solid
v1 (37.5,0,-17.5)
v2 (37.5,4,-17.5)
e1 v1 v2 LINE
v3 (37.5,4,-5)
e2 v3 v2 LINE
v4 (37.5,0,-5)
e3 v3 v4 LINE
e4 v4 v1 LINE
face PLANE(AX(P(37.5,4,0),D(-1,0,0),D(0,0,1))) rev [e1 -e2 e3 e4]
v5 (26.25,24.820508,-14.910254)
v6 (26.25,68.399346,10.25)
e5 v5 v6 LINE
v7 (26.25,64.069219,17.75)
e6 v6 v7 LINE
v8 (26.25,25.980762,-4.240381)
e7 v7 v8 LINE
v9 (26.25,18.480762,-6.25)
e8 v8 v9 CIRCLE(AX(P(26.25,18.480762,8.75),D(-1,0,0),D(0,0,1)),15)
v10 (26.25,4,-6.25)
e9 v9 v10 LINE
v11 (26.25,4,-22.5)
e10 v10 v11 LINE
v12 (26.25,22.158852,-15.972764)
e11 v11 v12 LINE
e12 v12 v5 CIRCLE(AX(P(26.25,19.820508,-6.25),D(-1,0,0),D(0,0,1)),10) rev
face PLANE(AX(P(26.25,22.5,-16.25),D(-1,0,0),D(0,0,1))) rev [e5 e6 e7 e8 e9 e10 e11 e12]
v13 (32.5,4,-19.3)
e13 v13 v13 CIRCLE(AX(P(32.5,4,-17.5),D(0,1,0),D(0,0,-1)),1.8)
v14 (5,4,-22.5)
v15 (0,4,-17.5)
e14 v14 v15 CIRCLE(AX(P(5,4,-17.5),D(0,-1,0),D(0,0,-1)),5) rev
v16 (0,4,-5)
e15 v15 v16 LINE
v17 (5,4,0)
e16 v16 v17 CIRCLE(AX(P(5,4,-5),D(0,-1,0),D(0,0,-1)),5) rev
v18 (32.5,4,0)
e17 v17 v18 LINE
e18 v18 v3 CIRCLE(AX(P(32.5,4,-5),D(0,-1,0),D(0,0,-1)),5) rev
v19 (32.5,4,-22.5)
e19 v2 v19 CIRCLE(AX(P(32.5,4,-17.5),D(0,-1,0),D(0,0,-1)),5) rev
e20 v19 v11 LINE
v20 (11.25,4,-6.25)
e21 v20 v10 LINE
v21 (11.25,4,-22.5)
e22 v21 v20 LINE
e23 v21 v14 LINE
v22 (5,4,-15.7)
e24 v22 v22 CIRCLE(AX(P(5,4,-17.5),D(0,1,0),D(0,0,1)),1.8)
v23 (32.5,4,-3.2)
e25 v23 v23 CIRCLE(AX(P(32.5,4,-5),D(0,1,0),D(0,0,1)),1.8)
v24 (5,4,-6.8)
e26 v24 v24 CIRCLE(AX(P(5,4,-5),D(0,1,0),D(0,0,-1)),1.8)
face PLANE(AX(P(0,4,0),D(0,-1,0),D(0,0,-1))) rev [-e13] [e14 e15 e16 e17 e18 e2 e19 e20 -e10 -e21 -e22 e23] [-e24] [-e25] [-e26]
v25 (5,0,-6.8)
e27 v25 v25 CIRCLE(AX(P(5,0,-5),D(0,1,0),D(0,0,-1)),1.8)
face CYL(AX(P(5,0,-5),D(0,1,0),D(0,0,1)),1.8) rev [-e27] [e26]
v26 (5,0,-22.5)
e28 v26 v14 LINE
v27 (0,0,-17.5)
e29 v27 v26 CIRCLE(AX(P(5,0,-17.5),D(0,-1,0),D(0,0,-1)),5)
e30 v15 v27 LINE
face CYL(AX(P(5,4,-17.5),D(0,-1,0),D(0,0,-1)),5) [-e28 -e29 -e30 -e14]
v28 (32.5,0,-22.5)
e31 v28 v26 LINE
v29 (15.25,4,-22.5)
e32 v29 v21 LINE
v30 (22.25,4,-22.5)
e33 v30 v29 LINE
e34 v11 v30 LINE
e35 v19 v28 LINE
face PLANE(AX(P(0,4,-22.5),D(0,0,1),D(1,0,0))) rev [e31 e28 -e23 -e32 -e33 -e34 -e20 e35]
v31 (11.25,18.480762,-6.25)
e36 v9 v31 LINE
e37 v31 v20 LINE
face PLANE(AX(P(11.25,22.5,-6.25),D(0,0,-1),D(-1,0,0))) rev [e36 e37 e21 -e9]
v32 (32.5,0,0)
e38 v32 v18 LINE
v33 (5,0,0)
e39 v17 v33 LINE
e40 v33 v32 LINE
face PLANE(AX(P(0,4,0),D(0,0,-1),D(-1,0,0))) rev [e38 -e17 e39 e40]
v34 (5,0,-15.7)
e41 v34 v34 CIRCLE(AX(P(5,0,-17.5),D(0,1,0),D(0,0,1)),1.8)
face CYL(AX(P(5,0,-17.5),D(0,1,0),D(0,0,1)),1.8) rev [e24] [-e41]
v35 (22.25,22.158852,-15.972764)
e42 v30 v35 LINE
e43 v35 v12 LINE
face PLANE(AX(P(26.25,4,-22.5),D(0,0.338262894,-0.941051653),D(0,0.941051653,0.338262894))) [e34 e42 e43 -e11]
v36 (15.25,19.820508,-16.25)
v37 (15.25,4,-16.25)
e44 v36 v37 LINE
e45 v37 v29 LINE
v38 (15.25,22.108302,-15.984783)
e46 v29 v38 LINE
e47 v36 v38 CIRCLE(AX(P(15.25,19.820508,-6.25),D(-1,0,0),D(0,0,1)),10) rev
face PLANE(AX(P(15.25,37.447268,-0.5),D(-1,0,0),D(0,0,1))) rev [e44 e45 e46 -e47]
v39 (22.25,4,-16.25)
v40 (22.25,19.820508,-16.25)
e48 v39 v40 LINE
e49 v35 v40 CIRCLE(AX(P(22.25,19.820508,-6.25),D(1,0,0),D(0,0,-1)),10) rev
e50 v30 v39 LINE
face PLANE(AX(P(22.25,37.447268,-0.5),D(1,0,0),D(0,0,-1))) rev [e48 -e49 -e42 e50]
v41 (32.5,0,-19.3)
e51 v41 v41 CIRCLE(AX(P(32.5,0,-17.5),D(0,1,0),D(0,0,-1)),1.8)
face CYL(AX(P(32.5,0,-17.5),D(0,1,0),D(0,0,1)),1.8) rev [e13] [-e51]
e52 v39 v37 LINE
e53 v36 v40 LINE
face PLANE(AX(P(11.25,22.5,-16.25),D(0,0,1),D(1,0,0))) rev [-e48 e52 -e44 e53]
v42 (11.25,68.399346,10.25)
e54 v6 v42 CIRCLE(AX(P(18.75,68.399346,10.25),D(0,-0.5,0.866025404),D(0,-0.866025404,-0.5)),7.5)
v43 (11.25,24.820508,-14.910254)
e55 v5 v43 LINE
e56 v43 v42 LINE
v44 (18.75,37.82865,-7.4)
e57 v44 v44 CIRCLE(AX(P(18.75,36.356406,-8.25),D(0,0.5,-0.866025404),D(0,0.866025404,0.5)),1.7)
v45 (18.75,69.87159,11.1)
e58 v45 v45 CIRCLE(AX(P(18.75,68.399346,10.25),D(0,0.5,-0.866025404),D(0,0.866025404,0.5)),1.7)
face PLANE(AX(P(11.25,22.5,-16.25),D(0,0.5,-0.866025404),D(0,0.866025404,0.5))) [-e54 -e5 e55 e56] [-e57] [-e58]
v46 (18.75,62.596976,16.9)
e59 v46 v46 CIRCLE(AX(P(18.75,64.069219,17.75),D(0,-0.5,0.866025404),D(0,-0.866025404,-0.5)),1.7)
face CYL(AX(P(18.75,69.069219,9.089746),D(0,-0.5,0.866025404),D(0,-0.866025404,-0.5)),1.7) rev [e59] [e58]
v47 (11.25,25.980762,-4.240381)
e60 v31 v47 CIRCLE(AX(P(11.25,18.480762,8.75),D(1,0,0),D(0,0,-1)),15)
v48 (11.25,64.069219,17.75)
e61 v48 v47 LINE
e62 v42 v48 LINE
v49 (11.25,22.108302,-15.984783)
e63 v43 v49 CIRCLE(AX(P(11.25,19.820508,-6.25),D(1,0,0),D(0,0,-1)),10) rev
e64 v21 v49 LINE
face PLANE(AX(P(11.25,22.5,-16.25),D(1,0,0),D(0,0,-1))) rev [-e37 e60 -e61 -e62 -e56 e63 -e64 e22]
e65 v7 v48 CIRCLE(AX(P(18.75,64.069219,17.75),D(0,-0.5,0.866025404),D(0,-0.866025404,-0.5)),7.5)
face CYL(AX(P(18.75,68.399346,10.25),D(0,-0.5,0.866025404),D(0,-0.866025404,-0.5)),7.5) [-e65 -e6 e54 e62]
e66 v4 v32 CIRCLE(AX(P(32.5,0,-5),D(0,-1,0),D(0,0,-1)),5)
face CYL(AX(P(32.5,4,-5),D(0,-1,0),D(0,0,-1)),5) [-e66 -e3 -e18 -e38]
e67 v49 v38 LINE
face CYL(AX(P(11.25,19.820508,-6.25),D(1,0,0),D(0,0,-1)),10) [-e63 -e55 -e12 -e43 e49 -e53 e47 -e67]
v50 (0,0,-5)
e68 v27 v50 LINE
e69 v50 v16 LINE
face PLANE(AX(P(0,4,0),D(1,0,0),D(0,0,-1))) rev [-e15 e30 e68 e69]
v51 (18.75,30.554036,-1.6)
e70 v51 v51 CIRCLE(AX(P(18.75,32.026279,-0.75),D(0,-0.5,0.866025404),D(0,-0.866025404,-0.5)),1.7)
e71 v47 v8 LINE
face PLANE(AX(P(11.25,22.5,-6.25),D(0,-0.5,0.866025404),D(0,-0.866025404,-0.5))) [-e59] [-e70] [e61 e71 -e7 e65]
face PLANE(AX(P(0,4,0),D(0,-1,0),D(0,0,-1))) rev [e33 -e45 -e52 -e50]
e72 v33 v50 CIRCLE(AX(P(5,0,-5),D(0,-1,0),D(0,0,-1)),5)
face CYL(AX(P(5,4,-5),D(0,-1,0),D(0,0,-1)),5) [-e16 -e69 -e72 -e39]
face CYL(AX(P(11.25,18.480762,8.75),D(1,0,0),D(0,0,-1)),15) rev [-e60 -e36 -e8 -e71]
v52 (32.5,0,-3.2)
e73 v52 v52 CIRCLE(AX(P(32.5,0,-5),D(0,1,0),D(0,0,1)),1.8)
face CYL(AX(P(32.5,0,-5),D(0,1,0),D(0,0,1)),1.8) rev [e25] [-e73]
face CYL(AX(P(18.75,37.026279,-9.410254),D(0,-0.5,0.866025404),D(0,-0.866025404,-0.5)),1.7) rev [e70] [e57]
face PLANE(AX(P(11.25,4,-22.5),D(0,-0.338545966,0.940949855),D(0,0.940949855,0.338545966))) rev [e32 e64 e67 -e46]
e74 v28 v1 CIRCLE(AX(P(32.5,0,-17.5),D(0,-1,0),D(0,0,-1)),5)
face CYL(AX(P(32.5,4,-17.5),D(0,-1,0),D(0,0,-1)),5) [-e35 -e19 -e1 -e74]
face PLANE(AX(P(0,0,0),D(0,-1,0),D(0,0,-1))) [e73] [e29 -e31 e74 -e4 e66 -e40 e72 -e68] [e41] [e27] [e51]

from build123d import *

# Parameters (mm, degrees)
SKETCH_1_W          = 37.5
SKETCH_1_H          = 22.5
EXTRUDE_2_DEPTH     = 4
SKETCH_2_W          = 15
SKETCH_2_H          = 10
EXTRUDE_3_DEPTH     = 18.5
EXTRUDE_4_DEPTH     = 15
EXTRUDE_5_DEPTH     = 8.66025404
SKETCH_5_R          = 1.7
CUT_EXTRUDE_1_DEPTH = 10
FILLET_1_R          = 15
FILLET_3_R          = 5
SKETCH_9_R          = 1.8
CUT_EXTRUDE_2_DEPTH = 4
FILLET_5_R          = 10
RIB_10_REACH        = 84.489
SKETCH_16_WALL_W    = 186.275176358
SKETCH_16_WALL_H    = 4
RIB_11_REACH        = 84.489
SKETCH_17_WALL_W    = 186.223541182
SKETCH_17_WALL_H    = 4


with BuildPart() as part:
    # 草图1 → 凸台-拉伸2 (new body)
    with BuildSketch(Plane(origin=(0, 0, 0), x_dir=(1, 0, 0), z_dir=(0, 1, 0))):
        with Locations((18.75, 11.25)):
            Rectangle(SKETCH_1_W, SKETCH_1_H)
    extrude(amount=EXTRUDE_2_DEPTH)

    # 草图2 → 凸台-拉伸3 (add)
    with BuildSketch(Plane(origin=(0, 4, 0), x_dir=(1, 0, 0), z_dir=(0, 1, 0))):
        with Locations((18.75, 11.25)):
            Rectangle(SKETCH_2_W, SKETCH_2_H)
    extrude(amount=EXTRUDE_3_DEPTH)

    # 草图3 → 凸台-拉伸4 (add)
    with BuildSketch(Plane(origin=(26.25, 0, 0), x_dir=(0, 0, -1), z_dir=(1, 0, 0))):
        Polygon((6.25, 22.5), (-17.75, 64.069219382), (-10.25, 68.399346401), (16.25, 22.5), align=None)
    extrude(amount=-EXTRUDE_4_DEPTH)

    # 草图4 → 凸台-拉伸5 (add)
    with BuildSketch(Plane(origin=(0, 8.331329387, -14.430285793), x_dir=(1, 0, 0), z_dir=(0, -0.5000000000000041, 0.8660254037844363))):
        with BuildLine():
            Line((26.25, 64.360571585), (11.25, 64.360571585))
            ThreePointArc((11.25, 64.360571585), (18.75, 71.860571585), (26.25, 64.360571585))
        make_face()
    extrude(amount=-EXTRUDE_5_DEPTH)

    # 草图5 → 切除-拉伸1 (cut)
    with BuildSketch(Plane(origin=(0, 8.331329387, -14.430285793), x_dir=(1, 0, 0), z_dir=(0, -0.5000000000000041, 0.8660254037844363))):
        with Locations((18.75, 64.360571585)):
            Circle(SKETCH_5_R)
        with Locations((18.75, 27.360571585)):
            Circle(SKETCH_5_R)
    extrude(amount=-CUT_EXTRUDE_1_DEPTH, mode=Mode.SUBTRACT)

    # 圆角1
    fillet_1_edges = [part.edges().sort_by_distance(p)[0] for p in [
        (18.75, 22.5, -6.25),
    ]]
    fillet(fillet_1_edges, radius=FILLET_1_R)

    # 圆角3
    fillet_3_edges = [part.edges().sort_by_distance(p)[0] for p in [
        (37.5, 2, 0),
        (37.5, 2, -22.5),
        (0, 2, 0),
        (0, 2, -22.5),
    ]]
    fillet(fillet_3_edges, radius=FILLET_3_R)

    # 草图9 → 切除-拉伸2 (cut)
    with BuildSketch(Plane(origin=(0, 4, 0), x_dir=(1, 0, 0), z_dir=(0, 1, 0))):
        with Locations((5, 17.5)):
            Circle(SKETCH_9_R)
        with Locations((32.5, 17.5)):
            Circle(SKETCH_9_R)
        with Locations((32.5, 5)):
            Circle(SKETCH_9_R)
        with Locations((5, 5)):
            Circle(SKETCH_9_R)
    extrude(amount=-CUT_EXTRUDE_2_DEPTH, mode=Mode.SUBTRACT)

    # 圆角5
    fillet_5_edges = [part.edges().sort_by_distance(p)[0] for p in [
        (18.75, 22.5, -16.25),
    ]]
    fillet(fillet_5_edges, radius=FILLET_5_R)

    # 草图16 wall → 筋10 (add, up to next)
    with BuildSketch(Plane(origin=(26.25, 13.079426042, -19.236382193), x_dir=(0, 0.941051653324, 0.33826289447), z_dir=(0, -0.33826289447, 0.941051653324)), mode=Mode.PRIVATE) as rib_10_sk1:
        with Locations((0, 2)):
            Rectangle(SKETCH_16_WALL_W, SKETCH_16_WALL_H)
    rib_10_tool1 = extrude(rib_10_sk1.sketch, amount=RIB_10_REACH, mode=Mode.PRIVATE) - part.part
    add(rib_10_tool1.solids().sort_by_distance((26.25, 13.079426042, -19.236382193))[0])

    # 草图17 wall → 筋11 (add, up to next)
    with BuildSketch(Plane(origin=(11.25, 13.054150816, -19.242391515), x_dir=(0, 0.940949854763, 0.338545965597), z_dir=(0, 0.338545965597, -0.940949854763)), mode=Mode.PRIVATE) as rib_11_sk1:
        with Locations((0, 2)):
            Rectangle(SKETCH_17_WALL_W, SKETCH_17_WALL_H)
    rib_11_tool1 = extrude(rib_11_sk1.sketch, amount=-RIB_11_REACH, mode=Mode.PRIVATE) - part.part
    add(rib_11_tool1.solids().sort_by_distance((11.25, 13.054150816, -19.242391515))[0])


solid = part.part
